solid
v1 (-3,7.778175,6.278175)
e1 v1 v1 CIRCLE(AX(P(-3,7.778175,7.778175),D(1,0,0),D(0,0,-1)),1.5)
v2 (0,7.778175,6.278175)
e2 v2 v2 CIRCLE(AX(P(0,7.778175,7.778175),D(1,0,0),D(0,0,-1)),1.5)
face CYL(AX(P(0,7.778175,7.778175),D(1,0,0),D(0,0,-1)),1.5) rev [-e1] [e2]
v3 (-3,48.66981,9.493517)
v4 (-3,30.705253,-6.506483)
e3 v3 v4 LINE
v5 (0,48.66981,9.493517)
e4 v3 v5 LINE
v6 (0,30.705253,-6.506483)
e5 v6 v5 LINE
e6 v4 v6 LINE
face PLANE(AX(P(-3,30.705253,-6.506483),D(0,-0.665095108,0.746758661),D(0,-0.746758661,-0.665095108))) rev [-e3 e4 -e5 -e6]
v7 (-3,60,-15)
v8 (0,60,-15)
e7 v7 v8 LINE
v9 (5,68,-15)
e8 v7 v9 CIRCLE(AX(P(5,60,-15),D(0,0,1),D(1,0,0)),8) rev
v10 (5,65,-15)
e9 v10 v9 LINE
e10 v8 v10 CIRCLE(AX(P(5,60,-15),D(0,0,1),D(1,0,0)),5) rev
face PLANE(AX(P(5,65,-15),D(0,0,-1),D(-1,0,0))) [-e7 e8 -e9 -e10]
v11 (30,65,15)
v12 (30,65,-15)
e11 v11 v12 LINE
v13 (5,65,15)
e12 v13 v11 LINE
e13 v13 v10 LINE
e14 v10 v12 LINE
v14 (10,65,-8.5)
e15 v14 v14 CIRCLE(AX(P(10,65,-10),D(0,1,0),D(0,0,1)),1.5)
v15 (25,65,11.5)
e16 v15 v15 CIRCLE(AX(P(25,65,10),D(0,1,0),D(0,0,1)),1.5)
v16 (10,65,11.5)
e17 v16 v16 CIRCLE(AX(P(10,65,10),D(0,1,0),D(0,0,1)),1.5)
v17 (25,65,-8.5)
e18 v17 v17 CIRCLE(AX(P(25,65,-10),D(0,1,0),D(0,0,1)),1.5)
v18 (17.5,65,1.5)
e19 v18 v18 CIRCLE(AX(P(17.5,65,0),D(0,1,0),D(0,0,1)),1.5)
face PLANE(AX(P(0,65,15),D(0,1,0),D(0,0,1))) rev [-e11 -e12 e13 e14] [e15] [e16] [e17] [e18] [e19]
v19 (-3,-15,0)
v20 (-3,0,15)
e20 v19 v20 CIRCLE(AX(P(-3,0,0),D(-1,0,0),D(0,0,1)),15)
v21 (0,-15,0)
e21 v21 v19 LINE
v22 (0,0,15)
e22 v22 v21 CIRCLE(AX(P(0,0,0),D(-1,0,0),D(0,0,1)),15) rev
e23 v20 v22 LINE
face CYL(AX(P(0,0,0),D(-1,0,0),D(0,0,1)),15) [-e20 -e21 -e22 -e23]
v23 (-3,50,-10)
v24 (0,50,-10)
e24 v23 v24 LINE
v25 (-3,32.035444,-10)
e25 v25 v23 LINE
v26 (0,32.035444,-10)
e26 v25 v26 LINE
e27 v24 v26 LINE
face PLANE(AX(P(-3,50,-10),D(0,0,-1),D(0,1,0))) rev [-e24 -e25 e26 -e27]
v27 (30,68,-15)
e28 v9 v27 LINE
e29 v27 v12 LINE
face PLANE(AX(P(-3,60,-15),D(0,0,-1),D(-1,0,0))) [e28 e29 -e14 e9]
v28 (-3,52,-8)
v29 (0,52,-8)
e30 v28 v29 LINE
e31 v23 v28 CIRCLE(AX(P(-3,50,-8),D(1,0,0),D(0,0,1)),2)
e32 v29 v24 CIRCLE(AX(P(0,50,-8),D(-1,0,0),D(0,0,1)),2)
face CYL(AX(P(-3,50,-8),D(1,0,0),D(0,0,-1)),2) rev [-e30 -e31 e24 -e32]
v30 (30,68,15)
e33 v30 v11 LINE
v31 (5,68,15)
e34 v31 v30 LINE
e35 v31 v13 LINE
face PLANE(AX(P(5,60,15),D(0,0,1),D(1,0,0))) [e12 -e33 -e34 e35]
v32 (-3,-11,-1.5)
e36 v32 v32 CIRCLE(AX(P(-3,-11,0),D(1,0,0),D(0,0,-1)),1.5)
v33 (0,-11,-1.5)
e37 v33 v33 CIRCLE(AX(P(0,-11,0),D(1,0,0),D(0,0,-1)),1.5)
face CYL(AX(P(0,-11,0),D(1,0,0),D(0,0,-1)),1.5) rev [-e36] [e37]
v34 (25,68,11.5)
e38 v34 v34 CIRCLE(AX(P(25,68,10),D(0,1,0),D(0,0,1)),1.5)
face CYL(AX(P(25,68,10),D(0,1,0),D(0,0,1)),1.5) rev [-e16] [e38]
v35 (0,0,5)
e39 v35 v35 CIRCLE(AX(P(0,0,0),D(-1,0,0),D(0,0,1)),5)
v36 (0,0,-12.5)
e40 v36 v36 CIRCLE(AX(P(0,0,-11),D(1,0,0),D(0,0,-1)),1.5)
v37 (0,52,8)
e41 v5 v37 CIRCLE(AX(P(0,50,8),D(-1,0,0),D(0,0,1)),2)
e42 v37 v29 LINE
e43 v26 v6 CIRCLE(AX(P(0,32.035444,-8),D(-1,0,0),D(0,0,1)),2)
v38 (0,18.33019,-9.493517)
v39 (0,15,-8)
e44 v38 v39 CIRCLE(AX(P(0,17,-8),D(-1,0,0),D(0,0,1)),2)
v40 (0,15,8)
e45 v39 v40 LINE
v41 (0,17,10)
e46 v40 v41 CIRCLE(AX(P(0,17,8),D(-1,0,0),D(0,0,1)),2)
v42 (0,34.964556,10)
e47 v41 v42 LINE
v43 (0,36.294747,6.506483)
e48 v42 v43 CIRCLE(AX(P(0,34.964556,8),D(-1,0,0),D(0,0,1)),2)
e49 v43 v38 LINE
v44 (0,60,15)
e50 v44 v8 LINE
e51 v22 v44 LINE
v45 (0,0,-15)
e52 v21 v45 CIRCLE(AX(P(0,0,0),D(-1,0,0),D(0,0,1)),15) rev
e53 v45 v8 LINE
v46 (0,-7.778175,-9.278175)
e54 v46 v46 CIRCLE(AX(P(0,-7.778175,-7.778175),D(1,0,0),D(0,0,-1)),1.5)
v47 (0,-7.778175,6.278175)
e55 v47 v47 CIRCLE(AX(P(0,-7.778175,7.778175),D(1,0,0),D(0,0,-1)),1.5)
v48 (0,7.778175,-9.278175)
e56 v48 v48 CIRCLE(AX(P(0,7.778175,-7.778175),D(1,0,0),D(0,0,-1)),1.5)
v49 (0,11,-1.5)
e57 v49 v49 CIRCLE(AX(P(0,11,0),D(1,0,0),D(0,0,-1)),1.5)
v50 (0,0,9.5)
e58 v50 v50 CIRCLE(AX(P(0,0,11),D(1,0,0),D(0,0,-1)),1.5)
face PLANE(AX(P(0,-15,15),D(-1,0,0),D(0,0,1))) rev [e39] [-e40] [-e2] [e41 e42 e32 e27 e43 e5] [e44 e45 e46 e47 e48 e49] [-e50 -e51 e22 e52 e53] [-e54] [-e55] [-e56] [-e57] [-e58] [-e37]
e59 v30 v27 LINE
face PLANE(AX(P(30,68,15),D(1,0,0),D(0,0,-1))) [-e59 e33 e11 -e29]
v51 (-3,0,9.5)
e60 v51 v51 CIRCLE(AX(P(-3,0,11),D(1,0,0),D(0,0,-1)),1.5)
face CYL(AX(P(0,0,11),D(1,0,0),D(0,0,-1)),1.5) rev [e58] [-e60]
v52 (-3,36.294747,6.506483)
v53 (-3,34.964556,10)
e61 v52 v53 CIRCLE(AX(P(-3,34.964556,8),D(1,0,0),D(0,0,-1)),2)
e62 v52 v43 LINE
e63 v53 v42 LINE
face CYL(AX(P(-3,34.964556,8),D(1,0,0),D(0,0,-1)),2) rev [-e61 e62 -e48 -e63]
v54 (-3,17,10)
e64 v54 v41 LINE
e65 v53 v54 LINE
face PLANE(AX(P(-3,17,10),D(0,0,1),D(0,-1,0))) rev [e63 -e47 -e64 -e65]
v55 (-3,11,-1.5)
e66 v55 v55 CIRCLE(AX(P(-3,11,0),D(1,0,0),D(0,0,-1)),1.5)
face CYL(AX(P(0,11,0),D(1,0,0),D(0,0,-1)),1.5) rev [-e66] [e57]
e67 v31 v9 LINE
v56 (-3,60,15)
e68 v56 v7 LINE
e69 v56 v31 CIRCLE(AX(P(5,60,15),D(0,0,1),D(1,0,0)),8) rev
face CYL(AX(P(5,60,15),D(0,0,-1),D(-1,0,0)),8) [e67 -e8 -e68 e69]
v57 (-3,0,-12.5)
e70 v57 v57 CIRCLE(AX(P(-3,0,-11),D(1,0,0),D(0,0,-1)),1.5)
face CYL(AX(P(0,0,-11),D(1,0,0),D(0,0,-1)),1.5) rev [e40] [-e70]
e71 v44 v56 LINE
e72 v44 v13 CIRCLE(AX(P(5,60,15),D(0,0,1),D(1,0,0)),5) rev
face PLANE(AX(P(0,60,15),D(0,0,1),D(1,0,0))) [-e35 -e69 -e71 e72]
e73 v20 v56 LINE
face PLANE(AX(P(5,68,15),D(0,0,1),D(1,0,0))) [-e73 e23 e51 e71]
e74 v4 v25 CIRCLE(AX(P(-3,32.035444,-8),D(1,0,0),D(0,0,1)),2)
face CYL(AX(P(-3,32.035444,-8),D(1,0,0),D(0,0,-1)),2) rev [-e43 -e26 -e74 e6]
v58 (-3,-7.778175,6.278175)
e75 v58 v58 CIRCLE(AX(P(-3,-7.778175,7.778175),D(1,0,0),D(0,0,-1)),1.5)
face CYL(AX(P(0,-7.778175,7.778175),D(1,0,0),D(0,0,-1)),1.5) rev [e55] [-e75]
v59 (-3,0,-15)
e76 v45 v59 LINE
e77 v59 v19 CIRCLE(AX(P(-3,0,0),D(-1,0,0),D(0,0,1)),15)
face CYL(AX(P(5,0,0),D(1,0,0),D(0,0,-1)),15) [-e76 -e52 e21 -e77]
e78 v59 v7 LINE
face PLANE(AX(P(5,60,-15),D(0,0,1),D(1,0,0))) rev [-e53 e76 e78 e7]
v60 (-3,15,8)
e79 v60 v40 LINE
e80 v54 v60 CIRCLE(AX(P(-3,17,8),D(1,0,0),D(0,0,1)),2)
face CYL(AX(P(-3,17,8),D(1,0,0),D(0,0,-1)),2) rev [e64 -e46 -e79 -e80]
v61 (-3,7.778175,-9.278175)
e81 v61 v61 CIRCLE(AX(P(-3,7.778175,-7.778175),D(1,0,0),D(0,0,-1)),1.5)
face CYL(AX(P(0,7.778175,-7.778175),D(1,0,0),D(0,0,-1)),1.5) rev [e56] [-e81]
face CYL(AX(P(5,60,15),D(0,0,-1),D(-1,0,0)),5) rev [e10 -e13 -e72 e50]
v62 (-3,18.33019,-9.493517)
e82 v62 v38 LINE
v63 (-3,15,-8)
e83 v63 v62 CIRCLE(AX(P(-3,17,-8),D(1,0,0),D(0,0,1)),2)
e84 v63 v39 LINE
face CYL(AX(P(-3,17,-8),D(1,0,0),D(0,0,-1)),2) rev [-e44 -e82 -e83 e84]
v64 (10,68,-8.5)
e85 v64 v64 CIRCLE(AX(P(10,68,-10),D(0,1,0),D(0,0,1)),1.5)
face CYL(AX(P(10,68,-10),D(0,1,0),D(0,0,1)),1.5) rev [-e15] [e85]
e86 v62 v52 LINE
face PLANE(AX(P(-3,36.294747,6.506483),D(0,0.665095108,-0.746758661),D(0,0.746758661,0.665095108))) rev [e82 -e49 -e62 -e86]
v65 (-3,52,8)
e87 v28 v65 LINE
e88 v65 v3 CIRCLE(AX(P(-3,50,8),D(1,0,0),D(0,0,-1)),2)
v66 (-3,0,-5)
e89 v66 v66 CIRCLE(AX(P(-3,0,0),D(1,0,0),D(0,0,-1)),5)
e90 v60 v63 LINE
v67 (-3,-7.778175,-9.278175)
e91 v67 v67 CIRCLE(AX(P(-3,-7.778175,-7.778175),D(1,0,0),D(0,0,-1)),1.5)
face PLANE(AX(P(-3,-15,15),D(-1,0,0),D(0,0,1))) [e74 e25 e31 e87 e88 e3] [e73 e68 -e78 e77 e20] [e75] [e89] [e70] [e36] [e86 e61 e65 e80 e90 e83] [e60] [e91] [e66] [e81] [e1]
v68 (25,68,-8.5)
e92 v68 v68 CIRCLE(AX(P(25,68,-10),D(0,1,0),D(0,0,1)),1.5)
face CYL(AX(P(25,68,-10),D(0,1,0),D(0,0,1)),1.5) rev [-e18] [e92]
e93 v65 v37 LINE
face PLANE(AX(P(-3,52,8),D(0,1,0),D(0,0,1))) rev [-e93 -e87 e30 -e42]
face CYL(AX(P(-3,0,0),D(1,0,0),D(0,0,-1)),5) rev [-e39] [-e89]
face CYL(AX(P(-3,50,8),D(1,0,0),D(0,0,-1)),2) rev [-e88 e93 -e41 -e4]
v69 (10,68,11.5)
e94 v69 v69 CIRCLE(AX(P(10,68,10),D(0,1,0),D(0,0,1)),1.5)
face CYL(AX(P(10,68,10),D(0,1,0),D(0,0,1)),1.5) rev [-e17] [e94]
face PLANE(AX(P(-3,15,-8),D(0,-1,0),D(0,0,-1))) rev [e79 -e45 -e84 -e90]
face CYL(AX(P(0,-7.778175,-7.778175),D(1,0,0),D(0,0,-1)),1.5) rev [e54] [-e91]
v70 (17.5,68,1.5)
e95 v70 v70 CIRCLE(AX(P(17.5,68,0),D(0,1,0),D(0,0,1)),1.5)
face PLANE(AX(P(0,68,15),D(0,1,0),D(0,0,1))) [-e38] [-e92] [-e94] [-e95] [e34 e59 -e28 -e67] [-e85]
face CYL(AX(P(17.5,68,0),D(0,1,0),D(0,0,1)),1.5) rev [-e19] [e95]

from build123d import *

# Parameters (mm, degrees)
BASIS_BLECH1_DEPTH                   = 15
SCHNITT_LINEAR_AUSTRAGEN1_DEPTH      = 76.822160349
SCHNITT_LINEAR_AUSTRAGEN1_DEPTH_BACK = 76.822160349
SKIZZE2_R                            = 5
VERRUNDUNG1_R                        = 15
F_3_0_3_DURCHMESSER_BOHRUNG1_D       = 3
F_3_0MM_DOWEL_HOLE1_D                = 3


# Sheet-metal steps are written as plain solids
with BuildPart() as part:
    # Skizze1 → Basis-Blech1 (new, symmetric)
    with BuildSketch(Plane.XY):
        with BuildLine():
            Line((0, -15), (0, 60))
            ThreePointArc((0, 60), (1.464466094, 63.535533906), (5, 65))
            Line((5, 65), (30, 65))
            Line((30, 65), (30, 68))
            Line((30, 68), (5, 68))
            ThreePointArc((5, 68), (-0.656854249, 65.656854249), (-3, 60))
            Line((-3, 60), (-3, -15))
            Line((-3, -15), (0, -15))
        make_face()
    extrude(amount=BASIS_BLECH1_DEPTH, both=True)

    # Skizze2 → Schnitt-Linear austragen1 (cut, two sides: drawn at the far end of the back side and taken through both)
    with BuildSketch(Plane(origin=(0, 0, 0), x_dir=(0, 0, -1), z_dir=(1, 0, 0)).offset(-SCHNITT_LINEAR_AUSTRAGEN1_DEPTH_BACK)):
        Circle(SKIZZE2_R)
        with BuildLine():
            Line((-8, 52), (8, 52))
            ThreePointArc((8, 52), (9.414213562, 51.414213562), (10, 50))
            Line((10, 50), (10, 32.035443619))
            ThreePointArc((10, 32.035443619), (8.711675965, 30.166348298), (6.506482679, 30.705253403))
            Line((6.506482679, 30.705253403), (-9.493517321, 48.669809784))
            ThreePointArc((-9.493517321, 48.669809784), (-9.824880877, 50.818419076), (-8, 52))
        make_face()
        with BuildLine():
            Line((-6.506482679, 36.294746597), (9.493517321, 18.330190216))
            ThreePointArc((9.493517321, 18.330190216), (9.824880877, 16.181580924), (8, 15))
            Line((8, 15), (-8, 15))
            ThreePointArc((-8, 15), (-9.414213562, 15.585786438), (-10, 17))
            Line((-10, 17), (-10, 34.964556381))
            ThreePointArc((-10, 34.964556381), (-8.711675965, 36.833651702), (-6.506482679, 36.294746597))
        make_face()
    extrude(amount=SCHNITT_LINEAR_AUSTRAGEN1_DEPTH + SCHNITT_LINEAR_AUSTRAGEN1_DEPTH_BACK, mode=Mode.SUBTRACT)

    # Verrundung1
    verrundung1_edges = [part.edges().sort_by_distance(p)[0] for p in [
        (-1.5, -15, -15),
        (-1.5, -15, 15),
    ]]
    fillet(verrundung1_edges, radius=VERRUNDUNG1_R - 0.0001)  # a hair under: the kernel refuses the full size

    # Ø3.0 (3) Durchmesser Bohrung1 (through all)
    with Locations(Plane(origin=(0, 0, 0), x_dir=(0, 0, -1), z_dir=(1, 0, 0))):
        with Locations((11, 0), (7.778174593, 7.778174593), (0, 11), (-7.778174593, 7.778174593), (-11, 0), (-7.778174593, -7.778174593), (0, -11), (7.778174593, -7.778174593)):
            Hole(F_3_0_3_DURCHMESSER_BOHRUNG1_D / 2)

    # Ø3.0mm Dowel Hole1 (through all)
    with Locations(Plane(origin=(0, 68, 0), x_dir=(1, 0, 0), z_dir=(0, 1, 0))):
        with Locations((10, 10), (25, 10), (17.5, 0), (10, -10), (25, -10)):
            Hole(F_3_0MM_DOWEL_HOLE1_D / 2)


solid = part.part
